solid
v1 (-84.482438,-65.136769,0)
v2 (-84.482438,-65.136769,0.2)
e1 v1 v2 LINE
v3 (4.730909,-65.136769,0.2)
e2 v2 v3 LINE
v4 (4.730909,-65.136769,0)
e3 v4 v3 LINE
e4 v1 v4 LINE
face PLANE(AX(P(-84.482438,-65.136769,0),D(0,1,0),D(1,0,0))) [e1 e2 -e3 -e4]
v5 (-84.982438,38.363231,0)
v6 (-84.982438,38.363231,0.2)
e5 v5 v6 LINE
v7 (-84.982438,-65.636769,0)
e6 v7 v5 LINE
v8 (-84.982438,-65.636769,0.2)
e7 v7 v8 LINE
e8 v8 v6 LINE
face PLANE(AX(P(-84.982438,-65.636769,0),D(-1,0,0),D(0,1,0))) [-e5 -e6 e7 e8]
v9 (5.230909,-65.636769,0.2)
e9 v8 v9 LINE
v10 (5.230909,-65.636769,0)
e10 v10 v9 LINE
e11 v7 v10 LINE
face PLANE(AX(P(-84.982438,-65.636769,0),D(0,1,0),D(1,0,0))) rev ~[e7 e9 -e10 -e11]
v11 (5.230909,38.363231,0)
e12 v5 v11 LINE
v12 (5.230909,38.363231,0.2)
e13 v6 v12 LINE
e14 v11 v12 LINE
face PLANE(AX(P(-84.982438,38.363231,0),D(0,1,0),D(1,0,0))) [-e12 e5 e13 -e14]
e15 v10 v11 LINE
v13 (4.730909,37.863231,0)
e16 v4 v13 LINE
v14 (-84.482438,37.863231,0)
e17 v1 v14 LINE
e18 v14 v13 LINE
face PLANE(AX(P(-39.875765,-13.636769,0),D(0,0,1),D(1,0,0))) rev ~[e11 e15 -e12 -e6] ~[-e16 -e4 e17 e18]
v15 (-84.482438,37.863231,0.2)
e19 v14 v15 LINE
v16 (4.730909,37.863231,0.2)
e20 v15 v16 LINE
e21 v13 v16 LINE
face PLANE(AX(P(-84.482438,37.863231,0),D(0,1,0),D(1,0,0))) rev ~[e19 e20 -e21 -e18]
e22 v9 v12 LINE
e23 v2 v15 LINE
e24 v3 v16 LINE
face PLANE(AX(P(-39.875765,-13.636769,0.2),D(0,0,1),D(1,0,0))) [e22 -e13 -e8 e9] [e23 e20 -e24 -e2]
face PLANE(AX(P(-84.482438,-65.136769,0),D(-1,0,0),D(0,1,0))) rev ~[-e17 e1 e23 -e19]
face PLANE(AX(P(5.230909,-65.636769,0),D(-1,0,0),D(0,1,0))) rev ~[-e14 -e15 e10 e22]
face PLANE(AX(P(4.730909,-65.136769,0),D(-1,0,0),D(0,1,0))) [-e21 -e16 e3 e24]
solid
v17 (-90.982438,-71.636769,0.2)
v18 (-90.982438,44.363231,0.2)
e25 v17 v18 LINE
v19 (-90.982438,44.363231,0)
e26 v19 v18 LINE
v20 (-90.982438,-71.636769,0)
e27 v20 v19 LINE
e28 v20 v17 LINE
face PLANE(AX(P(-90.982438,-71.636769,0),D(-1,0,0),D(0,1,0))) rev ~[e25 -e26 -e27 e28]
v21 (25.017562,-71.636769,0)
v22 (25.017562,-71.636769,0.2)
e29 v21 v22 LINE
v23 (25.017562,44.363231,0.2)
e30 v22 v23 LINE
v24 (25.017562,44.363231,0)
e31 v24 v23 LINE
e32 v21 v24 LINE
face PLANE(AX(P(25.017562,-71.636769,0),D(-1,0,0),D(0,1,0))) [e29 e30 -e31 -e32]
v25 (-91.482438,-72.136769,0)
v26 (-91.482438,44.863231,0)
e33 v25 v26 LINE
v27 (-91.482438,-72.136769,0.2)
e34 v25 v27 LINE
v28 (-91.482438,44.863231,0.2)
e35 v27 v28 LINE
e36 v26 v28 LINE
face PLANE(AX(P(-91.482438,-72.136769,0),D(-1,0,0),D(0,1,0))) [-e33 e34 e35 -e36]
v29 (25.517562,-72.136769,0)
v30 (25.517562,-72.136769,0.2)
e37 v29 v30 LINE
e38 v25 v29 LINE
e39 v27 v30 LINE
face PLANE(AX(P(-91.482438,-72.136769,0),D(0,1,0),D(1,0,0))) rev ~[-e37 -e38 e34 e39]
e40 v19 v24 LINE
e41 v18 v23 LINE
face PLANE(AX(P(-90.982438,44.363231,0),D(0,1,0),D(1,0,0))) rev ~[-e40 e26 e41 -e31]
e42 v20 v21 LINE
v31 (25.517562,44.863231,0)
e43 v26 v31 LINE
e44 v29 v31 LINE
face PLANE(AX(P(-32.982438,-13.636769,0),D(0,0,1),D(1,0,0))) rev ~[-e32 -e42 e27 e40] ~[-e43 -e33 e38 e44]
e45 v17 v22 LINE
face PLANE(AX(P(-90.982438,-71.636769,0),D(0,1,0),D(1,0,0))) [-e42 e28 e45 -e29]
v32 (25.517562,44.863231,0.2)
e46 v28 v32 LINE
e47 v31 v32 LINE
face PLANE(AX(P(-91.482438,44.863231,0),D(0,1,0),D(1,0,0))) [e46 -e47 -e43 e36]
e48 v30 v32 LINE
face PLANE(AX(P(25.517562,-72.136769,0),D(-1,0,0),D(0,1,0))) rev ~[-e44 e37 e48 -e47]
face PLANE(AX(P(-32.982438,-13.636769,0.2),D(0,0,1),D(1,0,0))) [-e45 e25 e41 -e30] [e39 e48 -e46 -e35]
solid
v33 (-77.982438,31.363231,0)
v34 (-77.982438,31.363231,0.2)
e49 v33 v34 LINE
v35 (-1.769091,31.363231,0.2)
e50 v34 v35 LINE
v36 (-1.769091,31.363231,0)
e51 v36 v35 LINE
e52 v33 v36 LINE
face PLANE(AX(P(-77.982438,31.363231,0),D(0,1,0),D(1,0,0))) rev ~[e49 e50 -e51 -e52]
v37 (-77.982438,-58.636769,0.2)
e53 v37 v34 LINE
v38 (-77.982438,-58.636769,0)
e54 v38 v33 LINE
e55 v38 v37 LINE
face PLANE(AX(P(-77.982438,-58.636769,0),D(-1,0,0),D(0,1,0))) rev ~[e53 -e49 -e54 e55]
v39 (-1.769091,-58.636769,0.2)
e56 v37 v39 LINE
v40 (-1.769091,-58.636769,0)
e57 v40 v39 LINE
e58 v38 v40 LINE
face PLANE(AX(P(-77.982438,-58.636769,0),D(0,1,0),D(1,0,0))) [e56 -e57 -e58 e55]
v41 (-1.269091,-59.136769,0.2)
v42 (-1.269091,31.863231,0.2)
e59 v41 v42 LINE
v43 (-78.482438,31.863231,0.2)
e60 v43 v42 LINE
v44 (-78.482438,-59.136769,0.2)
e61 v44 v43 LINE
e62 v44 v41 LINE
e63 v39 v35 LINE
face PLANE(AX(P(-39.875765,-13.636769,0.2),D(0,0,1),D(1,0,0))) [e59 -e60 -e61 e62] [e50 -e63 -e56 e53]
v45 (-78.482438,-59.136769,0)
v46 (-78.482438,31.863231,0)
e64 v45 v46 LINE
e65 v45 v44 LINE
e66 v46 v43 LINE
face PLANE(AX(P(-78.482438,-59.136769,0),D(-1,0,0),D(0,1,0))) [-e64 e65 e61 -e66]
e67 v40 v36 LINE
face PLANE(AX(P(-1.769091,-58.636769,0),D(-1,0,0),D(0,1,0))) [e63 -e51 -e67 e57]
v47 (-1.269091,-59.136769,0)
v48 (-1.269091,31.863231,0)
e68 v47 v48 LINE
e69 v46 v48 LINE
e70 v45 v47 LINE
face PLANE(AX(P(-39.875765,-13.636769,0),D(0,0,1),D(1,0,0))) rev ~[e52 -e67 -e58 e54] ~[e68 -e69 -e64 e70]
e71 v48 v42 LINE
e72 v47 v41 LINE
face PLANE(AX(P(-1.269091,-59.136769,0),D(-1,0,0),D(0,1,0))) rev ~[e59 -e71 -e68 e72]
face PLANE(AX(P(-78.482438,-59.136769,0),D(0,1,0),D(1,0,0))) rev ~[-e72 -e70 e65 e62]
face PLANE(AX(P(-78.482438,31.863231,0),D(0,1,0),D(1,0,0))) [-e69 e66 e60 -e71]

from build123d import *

# Parameters (mm, degrees)
F1_W     = 117
F1_H     = 117
F1_W_2   = 116
F1_H_2   = 116
F2_DEPTH = 0.2
F1_W_3   = 90.2133469
F1_H_3   = 104
F1_W_4   = 89.2133469
F1_H_4   = 103
F1_W_5   = 77.2133469
F1_H_5   = 91
F1_W_6   = 76.2133469
F1_H_6   = 90


# Not quite as in the source:
# - a feature names something its author has since deleted; it is built from what else it names


with BuildPart() as f2:
    # F1 (on Top) → F2 (new body)
    with BuildSketch(Plane.XY):
        with Locations((-32.9824382961, -13.6367691362)):
            Rectangle(F1_W, F1_H)
        with Locations((-32.9824382961, -13.6367691362)):
            Rectangle(F1_W_2, F1_H_2, mode=Mode.SUBTRACT)
    extrude(amount=F2_DEPTH)


with BuildPart() as f2b:
    # F1 (on Top) → F2, piece 2 (new body)
    with BuildSketch(Plane.XY):
        with Locations((-39.8757648461, -13.6367691362)):
            Rectangle(F1_W_3, F1_H_3)
        with Locations((-39.8757648461, -13.6367691362)):
            Rectangle(F1_W_4, F1_H_4, mode=Mode.SUBTRACT)
    extrude(amount=F2_DEPTH)


with BuildPart() as f2c:
    # F1 (on Top) → F2, piece 3 (new body)
    with BuildSketch(Plane.XY):
        with Locations((-39.8757648461, -13.6367691362)):
            Rectangle(F1_W_5, F1_H_5)
        with Locations((-39.8757648461, -13.6367691362)):
            Rectangle(F1_W_6, F1_H_6, mode=Mode.SUBTRACT)
    extrude(amount=F2_DEPTH)


solid = Compound([f2.part, f2b.part, f2c.part])
